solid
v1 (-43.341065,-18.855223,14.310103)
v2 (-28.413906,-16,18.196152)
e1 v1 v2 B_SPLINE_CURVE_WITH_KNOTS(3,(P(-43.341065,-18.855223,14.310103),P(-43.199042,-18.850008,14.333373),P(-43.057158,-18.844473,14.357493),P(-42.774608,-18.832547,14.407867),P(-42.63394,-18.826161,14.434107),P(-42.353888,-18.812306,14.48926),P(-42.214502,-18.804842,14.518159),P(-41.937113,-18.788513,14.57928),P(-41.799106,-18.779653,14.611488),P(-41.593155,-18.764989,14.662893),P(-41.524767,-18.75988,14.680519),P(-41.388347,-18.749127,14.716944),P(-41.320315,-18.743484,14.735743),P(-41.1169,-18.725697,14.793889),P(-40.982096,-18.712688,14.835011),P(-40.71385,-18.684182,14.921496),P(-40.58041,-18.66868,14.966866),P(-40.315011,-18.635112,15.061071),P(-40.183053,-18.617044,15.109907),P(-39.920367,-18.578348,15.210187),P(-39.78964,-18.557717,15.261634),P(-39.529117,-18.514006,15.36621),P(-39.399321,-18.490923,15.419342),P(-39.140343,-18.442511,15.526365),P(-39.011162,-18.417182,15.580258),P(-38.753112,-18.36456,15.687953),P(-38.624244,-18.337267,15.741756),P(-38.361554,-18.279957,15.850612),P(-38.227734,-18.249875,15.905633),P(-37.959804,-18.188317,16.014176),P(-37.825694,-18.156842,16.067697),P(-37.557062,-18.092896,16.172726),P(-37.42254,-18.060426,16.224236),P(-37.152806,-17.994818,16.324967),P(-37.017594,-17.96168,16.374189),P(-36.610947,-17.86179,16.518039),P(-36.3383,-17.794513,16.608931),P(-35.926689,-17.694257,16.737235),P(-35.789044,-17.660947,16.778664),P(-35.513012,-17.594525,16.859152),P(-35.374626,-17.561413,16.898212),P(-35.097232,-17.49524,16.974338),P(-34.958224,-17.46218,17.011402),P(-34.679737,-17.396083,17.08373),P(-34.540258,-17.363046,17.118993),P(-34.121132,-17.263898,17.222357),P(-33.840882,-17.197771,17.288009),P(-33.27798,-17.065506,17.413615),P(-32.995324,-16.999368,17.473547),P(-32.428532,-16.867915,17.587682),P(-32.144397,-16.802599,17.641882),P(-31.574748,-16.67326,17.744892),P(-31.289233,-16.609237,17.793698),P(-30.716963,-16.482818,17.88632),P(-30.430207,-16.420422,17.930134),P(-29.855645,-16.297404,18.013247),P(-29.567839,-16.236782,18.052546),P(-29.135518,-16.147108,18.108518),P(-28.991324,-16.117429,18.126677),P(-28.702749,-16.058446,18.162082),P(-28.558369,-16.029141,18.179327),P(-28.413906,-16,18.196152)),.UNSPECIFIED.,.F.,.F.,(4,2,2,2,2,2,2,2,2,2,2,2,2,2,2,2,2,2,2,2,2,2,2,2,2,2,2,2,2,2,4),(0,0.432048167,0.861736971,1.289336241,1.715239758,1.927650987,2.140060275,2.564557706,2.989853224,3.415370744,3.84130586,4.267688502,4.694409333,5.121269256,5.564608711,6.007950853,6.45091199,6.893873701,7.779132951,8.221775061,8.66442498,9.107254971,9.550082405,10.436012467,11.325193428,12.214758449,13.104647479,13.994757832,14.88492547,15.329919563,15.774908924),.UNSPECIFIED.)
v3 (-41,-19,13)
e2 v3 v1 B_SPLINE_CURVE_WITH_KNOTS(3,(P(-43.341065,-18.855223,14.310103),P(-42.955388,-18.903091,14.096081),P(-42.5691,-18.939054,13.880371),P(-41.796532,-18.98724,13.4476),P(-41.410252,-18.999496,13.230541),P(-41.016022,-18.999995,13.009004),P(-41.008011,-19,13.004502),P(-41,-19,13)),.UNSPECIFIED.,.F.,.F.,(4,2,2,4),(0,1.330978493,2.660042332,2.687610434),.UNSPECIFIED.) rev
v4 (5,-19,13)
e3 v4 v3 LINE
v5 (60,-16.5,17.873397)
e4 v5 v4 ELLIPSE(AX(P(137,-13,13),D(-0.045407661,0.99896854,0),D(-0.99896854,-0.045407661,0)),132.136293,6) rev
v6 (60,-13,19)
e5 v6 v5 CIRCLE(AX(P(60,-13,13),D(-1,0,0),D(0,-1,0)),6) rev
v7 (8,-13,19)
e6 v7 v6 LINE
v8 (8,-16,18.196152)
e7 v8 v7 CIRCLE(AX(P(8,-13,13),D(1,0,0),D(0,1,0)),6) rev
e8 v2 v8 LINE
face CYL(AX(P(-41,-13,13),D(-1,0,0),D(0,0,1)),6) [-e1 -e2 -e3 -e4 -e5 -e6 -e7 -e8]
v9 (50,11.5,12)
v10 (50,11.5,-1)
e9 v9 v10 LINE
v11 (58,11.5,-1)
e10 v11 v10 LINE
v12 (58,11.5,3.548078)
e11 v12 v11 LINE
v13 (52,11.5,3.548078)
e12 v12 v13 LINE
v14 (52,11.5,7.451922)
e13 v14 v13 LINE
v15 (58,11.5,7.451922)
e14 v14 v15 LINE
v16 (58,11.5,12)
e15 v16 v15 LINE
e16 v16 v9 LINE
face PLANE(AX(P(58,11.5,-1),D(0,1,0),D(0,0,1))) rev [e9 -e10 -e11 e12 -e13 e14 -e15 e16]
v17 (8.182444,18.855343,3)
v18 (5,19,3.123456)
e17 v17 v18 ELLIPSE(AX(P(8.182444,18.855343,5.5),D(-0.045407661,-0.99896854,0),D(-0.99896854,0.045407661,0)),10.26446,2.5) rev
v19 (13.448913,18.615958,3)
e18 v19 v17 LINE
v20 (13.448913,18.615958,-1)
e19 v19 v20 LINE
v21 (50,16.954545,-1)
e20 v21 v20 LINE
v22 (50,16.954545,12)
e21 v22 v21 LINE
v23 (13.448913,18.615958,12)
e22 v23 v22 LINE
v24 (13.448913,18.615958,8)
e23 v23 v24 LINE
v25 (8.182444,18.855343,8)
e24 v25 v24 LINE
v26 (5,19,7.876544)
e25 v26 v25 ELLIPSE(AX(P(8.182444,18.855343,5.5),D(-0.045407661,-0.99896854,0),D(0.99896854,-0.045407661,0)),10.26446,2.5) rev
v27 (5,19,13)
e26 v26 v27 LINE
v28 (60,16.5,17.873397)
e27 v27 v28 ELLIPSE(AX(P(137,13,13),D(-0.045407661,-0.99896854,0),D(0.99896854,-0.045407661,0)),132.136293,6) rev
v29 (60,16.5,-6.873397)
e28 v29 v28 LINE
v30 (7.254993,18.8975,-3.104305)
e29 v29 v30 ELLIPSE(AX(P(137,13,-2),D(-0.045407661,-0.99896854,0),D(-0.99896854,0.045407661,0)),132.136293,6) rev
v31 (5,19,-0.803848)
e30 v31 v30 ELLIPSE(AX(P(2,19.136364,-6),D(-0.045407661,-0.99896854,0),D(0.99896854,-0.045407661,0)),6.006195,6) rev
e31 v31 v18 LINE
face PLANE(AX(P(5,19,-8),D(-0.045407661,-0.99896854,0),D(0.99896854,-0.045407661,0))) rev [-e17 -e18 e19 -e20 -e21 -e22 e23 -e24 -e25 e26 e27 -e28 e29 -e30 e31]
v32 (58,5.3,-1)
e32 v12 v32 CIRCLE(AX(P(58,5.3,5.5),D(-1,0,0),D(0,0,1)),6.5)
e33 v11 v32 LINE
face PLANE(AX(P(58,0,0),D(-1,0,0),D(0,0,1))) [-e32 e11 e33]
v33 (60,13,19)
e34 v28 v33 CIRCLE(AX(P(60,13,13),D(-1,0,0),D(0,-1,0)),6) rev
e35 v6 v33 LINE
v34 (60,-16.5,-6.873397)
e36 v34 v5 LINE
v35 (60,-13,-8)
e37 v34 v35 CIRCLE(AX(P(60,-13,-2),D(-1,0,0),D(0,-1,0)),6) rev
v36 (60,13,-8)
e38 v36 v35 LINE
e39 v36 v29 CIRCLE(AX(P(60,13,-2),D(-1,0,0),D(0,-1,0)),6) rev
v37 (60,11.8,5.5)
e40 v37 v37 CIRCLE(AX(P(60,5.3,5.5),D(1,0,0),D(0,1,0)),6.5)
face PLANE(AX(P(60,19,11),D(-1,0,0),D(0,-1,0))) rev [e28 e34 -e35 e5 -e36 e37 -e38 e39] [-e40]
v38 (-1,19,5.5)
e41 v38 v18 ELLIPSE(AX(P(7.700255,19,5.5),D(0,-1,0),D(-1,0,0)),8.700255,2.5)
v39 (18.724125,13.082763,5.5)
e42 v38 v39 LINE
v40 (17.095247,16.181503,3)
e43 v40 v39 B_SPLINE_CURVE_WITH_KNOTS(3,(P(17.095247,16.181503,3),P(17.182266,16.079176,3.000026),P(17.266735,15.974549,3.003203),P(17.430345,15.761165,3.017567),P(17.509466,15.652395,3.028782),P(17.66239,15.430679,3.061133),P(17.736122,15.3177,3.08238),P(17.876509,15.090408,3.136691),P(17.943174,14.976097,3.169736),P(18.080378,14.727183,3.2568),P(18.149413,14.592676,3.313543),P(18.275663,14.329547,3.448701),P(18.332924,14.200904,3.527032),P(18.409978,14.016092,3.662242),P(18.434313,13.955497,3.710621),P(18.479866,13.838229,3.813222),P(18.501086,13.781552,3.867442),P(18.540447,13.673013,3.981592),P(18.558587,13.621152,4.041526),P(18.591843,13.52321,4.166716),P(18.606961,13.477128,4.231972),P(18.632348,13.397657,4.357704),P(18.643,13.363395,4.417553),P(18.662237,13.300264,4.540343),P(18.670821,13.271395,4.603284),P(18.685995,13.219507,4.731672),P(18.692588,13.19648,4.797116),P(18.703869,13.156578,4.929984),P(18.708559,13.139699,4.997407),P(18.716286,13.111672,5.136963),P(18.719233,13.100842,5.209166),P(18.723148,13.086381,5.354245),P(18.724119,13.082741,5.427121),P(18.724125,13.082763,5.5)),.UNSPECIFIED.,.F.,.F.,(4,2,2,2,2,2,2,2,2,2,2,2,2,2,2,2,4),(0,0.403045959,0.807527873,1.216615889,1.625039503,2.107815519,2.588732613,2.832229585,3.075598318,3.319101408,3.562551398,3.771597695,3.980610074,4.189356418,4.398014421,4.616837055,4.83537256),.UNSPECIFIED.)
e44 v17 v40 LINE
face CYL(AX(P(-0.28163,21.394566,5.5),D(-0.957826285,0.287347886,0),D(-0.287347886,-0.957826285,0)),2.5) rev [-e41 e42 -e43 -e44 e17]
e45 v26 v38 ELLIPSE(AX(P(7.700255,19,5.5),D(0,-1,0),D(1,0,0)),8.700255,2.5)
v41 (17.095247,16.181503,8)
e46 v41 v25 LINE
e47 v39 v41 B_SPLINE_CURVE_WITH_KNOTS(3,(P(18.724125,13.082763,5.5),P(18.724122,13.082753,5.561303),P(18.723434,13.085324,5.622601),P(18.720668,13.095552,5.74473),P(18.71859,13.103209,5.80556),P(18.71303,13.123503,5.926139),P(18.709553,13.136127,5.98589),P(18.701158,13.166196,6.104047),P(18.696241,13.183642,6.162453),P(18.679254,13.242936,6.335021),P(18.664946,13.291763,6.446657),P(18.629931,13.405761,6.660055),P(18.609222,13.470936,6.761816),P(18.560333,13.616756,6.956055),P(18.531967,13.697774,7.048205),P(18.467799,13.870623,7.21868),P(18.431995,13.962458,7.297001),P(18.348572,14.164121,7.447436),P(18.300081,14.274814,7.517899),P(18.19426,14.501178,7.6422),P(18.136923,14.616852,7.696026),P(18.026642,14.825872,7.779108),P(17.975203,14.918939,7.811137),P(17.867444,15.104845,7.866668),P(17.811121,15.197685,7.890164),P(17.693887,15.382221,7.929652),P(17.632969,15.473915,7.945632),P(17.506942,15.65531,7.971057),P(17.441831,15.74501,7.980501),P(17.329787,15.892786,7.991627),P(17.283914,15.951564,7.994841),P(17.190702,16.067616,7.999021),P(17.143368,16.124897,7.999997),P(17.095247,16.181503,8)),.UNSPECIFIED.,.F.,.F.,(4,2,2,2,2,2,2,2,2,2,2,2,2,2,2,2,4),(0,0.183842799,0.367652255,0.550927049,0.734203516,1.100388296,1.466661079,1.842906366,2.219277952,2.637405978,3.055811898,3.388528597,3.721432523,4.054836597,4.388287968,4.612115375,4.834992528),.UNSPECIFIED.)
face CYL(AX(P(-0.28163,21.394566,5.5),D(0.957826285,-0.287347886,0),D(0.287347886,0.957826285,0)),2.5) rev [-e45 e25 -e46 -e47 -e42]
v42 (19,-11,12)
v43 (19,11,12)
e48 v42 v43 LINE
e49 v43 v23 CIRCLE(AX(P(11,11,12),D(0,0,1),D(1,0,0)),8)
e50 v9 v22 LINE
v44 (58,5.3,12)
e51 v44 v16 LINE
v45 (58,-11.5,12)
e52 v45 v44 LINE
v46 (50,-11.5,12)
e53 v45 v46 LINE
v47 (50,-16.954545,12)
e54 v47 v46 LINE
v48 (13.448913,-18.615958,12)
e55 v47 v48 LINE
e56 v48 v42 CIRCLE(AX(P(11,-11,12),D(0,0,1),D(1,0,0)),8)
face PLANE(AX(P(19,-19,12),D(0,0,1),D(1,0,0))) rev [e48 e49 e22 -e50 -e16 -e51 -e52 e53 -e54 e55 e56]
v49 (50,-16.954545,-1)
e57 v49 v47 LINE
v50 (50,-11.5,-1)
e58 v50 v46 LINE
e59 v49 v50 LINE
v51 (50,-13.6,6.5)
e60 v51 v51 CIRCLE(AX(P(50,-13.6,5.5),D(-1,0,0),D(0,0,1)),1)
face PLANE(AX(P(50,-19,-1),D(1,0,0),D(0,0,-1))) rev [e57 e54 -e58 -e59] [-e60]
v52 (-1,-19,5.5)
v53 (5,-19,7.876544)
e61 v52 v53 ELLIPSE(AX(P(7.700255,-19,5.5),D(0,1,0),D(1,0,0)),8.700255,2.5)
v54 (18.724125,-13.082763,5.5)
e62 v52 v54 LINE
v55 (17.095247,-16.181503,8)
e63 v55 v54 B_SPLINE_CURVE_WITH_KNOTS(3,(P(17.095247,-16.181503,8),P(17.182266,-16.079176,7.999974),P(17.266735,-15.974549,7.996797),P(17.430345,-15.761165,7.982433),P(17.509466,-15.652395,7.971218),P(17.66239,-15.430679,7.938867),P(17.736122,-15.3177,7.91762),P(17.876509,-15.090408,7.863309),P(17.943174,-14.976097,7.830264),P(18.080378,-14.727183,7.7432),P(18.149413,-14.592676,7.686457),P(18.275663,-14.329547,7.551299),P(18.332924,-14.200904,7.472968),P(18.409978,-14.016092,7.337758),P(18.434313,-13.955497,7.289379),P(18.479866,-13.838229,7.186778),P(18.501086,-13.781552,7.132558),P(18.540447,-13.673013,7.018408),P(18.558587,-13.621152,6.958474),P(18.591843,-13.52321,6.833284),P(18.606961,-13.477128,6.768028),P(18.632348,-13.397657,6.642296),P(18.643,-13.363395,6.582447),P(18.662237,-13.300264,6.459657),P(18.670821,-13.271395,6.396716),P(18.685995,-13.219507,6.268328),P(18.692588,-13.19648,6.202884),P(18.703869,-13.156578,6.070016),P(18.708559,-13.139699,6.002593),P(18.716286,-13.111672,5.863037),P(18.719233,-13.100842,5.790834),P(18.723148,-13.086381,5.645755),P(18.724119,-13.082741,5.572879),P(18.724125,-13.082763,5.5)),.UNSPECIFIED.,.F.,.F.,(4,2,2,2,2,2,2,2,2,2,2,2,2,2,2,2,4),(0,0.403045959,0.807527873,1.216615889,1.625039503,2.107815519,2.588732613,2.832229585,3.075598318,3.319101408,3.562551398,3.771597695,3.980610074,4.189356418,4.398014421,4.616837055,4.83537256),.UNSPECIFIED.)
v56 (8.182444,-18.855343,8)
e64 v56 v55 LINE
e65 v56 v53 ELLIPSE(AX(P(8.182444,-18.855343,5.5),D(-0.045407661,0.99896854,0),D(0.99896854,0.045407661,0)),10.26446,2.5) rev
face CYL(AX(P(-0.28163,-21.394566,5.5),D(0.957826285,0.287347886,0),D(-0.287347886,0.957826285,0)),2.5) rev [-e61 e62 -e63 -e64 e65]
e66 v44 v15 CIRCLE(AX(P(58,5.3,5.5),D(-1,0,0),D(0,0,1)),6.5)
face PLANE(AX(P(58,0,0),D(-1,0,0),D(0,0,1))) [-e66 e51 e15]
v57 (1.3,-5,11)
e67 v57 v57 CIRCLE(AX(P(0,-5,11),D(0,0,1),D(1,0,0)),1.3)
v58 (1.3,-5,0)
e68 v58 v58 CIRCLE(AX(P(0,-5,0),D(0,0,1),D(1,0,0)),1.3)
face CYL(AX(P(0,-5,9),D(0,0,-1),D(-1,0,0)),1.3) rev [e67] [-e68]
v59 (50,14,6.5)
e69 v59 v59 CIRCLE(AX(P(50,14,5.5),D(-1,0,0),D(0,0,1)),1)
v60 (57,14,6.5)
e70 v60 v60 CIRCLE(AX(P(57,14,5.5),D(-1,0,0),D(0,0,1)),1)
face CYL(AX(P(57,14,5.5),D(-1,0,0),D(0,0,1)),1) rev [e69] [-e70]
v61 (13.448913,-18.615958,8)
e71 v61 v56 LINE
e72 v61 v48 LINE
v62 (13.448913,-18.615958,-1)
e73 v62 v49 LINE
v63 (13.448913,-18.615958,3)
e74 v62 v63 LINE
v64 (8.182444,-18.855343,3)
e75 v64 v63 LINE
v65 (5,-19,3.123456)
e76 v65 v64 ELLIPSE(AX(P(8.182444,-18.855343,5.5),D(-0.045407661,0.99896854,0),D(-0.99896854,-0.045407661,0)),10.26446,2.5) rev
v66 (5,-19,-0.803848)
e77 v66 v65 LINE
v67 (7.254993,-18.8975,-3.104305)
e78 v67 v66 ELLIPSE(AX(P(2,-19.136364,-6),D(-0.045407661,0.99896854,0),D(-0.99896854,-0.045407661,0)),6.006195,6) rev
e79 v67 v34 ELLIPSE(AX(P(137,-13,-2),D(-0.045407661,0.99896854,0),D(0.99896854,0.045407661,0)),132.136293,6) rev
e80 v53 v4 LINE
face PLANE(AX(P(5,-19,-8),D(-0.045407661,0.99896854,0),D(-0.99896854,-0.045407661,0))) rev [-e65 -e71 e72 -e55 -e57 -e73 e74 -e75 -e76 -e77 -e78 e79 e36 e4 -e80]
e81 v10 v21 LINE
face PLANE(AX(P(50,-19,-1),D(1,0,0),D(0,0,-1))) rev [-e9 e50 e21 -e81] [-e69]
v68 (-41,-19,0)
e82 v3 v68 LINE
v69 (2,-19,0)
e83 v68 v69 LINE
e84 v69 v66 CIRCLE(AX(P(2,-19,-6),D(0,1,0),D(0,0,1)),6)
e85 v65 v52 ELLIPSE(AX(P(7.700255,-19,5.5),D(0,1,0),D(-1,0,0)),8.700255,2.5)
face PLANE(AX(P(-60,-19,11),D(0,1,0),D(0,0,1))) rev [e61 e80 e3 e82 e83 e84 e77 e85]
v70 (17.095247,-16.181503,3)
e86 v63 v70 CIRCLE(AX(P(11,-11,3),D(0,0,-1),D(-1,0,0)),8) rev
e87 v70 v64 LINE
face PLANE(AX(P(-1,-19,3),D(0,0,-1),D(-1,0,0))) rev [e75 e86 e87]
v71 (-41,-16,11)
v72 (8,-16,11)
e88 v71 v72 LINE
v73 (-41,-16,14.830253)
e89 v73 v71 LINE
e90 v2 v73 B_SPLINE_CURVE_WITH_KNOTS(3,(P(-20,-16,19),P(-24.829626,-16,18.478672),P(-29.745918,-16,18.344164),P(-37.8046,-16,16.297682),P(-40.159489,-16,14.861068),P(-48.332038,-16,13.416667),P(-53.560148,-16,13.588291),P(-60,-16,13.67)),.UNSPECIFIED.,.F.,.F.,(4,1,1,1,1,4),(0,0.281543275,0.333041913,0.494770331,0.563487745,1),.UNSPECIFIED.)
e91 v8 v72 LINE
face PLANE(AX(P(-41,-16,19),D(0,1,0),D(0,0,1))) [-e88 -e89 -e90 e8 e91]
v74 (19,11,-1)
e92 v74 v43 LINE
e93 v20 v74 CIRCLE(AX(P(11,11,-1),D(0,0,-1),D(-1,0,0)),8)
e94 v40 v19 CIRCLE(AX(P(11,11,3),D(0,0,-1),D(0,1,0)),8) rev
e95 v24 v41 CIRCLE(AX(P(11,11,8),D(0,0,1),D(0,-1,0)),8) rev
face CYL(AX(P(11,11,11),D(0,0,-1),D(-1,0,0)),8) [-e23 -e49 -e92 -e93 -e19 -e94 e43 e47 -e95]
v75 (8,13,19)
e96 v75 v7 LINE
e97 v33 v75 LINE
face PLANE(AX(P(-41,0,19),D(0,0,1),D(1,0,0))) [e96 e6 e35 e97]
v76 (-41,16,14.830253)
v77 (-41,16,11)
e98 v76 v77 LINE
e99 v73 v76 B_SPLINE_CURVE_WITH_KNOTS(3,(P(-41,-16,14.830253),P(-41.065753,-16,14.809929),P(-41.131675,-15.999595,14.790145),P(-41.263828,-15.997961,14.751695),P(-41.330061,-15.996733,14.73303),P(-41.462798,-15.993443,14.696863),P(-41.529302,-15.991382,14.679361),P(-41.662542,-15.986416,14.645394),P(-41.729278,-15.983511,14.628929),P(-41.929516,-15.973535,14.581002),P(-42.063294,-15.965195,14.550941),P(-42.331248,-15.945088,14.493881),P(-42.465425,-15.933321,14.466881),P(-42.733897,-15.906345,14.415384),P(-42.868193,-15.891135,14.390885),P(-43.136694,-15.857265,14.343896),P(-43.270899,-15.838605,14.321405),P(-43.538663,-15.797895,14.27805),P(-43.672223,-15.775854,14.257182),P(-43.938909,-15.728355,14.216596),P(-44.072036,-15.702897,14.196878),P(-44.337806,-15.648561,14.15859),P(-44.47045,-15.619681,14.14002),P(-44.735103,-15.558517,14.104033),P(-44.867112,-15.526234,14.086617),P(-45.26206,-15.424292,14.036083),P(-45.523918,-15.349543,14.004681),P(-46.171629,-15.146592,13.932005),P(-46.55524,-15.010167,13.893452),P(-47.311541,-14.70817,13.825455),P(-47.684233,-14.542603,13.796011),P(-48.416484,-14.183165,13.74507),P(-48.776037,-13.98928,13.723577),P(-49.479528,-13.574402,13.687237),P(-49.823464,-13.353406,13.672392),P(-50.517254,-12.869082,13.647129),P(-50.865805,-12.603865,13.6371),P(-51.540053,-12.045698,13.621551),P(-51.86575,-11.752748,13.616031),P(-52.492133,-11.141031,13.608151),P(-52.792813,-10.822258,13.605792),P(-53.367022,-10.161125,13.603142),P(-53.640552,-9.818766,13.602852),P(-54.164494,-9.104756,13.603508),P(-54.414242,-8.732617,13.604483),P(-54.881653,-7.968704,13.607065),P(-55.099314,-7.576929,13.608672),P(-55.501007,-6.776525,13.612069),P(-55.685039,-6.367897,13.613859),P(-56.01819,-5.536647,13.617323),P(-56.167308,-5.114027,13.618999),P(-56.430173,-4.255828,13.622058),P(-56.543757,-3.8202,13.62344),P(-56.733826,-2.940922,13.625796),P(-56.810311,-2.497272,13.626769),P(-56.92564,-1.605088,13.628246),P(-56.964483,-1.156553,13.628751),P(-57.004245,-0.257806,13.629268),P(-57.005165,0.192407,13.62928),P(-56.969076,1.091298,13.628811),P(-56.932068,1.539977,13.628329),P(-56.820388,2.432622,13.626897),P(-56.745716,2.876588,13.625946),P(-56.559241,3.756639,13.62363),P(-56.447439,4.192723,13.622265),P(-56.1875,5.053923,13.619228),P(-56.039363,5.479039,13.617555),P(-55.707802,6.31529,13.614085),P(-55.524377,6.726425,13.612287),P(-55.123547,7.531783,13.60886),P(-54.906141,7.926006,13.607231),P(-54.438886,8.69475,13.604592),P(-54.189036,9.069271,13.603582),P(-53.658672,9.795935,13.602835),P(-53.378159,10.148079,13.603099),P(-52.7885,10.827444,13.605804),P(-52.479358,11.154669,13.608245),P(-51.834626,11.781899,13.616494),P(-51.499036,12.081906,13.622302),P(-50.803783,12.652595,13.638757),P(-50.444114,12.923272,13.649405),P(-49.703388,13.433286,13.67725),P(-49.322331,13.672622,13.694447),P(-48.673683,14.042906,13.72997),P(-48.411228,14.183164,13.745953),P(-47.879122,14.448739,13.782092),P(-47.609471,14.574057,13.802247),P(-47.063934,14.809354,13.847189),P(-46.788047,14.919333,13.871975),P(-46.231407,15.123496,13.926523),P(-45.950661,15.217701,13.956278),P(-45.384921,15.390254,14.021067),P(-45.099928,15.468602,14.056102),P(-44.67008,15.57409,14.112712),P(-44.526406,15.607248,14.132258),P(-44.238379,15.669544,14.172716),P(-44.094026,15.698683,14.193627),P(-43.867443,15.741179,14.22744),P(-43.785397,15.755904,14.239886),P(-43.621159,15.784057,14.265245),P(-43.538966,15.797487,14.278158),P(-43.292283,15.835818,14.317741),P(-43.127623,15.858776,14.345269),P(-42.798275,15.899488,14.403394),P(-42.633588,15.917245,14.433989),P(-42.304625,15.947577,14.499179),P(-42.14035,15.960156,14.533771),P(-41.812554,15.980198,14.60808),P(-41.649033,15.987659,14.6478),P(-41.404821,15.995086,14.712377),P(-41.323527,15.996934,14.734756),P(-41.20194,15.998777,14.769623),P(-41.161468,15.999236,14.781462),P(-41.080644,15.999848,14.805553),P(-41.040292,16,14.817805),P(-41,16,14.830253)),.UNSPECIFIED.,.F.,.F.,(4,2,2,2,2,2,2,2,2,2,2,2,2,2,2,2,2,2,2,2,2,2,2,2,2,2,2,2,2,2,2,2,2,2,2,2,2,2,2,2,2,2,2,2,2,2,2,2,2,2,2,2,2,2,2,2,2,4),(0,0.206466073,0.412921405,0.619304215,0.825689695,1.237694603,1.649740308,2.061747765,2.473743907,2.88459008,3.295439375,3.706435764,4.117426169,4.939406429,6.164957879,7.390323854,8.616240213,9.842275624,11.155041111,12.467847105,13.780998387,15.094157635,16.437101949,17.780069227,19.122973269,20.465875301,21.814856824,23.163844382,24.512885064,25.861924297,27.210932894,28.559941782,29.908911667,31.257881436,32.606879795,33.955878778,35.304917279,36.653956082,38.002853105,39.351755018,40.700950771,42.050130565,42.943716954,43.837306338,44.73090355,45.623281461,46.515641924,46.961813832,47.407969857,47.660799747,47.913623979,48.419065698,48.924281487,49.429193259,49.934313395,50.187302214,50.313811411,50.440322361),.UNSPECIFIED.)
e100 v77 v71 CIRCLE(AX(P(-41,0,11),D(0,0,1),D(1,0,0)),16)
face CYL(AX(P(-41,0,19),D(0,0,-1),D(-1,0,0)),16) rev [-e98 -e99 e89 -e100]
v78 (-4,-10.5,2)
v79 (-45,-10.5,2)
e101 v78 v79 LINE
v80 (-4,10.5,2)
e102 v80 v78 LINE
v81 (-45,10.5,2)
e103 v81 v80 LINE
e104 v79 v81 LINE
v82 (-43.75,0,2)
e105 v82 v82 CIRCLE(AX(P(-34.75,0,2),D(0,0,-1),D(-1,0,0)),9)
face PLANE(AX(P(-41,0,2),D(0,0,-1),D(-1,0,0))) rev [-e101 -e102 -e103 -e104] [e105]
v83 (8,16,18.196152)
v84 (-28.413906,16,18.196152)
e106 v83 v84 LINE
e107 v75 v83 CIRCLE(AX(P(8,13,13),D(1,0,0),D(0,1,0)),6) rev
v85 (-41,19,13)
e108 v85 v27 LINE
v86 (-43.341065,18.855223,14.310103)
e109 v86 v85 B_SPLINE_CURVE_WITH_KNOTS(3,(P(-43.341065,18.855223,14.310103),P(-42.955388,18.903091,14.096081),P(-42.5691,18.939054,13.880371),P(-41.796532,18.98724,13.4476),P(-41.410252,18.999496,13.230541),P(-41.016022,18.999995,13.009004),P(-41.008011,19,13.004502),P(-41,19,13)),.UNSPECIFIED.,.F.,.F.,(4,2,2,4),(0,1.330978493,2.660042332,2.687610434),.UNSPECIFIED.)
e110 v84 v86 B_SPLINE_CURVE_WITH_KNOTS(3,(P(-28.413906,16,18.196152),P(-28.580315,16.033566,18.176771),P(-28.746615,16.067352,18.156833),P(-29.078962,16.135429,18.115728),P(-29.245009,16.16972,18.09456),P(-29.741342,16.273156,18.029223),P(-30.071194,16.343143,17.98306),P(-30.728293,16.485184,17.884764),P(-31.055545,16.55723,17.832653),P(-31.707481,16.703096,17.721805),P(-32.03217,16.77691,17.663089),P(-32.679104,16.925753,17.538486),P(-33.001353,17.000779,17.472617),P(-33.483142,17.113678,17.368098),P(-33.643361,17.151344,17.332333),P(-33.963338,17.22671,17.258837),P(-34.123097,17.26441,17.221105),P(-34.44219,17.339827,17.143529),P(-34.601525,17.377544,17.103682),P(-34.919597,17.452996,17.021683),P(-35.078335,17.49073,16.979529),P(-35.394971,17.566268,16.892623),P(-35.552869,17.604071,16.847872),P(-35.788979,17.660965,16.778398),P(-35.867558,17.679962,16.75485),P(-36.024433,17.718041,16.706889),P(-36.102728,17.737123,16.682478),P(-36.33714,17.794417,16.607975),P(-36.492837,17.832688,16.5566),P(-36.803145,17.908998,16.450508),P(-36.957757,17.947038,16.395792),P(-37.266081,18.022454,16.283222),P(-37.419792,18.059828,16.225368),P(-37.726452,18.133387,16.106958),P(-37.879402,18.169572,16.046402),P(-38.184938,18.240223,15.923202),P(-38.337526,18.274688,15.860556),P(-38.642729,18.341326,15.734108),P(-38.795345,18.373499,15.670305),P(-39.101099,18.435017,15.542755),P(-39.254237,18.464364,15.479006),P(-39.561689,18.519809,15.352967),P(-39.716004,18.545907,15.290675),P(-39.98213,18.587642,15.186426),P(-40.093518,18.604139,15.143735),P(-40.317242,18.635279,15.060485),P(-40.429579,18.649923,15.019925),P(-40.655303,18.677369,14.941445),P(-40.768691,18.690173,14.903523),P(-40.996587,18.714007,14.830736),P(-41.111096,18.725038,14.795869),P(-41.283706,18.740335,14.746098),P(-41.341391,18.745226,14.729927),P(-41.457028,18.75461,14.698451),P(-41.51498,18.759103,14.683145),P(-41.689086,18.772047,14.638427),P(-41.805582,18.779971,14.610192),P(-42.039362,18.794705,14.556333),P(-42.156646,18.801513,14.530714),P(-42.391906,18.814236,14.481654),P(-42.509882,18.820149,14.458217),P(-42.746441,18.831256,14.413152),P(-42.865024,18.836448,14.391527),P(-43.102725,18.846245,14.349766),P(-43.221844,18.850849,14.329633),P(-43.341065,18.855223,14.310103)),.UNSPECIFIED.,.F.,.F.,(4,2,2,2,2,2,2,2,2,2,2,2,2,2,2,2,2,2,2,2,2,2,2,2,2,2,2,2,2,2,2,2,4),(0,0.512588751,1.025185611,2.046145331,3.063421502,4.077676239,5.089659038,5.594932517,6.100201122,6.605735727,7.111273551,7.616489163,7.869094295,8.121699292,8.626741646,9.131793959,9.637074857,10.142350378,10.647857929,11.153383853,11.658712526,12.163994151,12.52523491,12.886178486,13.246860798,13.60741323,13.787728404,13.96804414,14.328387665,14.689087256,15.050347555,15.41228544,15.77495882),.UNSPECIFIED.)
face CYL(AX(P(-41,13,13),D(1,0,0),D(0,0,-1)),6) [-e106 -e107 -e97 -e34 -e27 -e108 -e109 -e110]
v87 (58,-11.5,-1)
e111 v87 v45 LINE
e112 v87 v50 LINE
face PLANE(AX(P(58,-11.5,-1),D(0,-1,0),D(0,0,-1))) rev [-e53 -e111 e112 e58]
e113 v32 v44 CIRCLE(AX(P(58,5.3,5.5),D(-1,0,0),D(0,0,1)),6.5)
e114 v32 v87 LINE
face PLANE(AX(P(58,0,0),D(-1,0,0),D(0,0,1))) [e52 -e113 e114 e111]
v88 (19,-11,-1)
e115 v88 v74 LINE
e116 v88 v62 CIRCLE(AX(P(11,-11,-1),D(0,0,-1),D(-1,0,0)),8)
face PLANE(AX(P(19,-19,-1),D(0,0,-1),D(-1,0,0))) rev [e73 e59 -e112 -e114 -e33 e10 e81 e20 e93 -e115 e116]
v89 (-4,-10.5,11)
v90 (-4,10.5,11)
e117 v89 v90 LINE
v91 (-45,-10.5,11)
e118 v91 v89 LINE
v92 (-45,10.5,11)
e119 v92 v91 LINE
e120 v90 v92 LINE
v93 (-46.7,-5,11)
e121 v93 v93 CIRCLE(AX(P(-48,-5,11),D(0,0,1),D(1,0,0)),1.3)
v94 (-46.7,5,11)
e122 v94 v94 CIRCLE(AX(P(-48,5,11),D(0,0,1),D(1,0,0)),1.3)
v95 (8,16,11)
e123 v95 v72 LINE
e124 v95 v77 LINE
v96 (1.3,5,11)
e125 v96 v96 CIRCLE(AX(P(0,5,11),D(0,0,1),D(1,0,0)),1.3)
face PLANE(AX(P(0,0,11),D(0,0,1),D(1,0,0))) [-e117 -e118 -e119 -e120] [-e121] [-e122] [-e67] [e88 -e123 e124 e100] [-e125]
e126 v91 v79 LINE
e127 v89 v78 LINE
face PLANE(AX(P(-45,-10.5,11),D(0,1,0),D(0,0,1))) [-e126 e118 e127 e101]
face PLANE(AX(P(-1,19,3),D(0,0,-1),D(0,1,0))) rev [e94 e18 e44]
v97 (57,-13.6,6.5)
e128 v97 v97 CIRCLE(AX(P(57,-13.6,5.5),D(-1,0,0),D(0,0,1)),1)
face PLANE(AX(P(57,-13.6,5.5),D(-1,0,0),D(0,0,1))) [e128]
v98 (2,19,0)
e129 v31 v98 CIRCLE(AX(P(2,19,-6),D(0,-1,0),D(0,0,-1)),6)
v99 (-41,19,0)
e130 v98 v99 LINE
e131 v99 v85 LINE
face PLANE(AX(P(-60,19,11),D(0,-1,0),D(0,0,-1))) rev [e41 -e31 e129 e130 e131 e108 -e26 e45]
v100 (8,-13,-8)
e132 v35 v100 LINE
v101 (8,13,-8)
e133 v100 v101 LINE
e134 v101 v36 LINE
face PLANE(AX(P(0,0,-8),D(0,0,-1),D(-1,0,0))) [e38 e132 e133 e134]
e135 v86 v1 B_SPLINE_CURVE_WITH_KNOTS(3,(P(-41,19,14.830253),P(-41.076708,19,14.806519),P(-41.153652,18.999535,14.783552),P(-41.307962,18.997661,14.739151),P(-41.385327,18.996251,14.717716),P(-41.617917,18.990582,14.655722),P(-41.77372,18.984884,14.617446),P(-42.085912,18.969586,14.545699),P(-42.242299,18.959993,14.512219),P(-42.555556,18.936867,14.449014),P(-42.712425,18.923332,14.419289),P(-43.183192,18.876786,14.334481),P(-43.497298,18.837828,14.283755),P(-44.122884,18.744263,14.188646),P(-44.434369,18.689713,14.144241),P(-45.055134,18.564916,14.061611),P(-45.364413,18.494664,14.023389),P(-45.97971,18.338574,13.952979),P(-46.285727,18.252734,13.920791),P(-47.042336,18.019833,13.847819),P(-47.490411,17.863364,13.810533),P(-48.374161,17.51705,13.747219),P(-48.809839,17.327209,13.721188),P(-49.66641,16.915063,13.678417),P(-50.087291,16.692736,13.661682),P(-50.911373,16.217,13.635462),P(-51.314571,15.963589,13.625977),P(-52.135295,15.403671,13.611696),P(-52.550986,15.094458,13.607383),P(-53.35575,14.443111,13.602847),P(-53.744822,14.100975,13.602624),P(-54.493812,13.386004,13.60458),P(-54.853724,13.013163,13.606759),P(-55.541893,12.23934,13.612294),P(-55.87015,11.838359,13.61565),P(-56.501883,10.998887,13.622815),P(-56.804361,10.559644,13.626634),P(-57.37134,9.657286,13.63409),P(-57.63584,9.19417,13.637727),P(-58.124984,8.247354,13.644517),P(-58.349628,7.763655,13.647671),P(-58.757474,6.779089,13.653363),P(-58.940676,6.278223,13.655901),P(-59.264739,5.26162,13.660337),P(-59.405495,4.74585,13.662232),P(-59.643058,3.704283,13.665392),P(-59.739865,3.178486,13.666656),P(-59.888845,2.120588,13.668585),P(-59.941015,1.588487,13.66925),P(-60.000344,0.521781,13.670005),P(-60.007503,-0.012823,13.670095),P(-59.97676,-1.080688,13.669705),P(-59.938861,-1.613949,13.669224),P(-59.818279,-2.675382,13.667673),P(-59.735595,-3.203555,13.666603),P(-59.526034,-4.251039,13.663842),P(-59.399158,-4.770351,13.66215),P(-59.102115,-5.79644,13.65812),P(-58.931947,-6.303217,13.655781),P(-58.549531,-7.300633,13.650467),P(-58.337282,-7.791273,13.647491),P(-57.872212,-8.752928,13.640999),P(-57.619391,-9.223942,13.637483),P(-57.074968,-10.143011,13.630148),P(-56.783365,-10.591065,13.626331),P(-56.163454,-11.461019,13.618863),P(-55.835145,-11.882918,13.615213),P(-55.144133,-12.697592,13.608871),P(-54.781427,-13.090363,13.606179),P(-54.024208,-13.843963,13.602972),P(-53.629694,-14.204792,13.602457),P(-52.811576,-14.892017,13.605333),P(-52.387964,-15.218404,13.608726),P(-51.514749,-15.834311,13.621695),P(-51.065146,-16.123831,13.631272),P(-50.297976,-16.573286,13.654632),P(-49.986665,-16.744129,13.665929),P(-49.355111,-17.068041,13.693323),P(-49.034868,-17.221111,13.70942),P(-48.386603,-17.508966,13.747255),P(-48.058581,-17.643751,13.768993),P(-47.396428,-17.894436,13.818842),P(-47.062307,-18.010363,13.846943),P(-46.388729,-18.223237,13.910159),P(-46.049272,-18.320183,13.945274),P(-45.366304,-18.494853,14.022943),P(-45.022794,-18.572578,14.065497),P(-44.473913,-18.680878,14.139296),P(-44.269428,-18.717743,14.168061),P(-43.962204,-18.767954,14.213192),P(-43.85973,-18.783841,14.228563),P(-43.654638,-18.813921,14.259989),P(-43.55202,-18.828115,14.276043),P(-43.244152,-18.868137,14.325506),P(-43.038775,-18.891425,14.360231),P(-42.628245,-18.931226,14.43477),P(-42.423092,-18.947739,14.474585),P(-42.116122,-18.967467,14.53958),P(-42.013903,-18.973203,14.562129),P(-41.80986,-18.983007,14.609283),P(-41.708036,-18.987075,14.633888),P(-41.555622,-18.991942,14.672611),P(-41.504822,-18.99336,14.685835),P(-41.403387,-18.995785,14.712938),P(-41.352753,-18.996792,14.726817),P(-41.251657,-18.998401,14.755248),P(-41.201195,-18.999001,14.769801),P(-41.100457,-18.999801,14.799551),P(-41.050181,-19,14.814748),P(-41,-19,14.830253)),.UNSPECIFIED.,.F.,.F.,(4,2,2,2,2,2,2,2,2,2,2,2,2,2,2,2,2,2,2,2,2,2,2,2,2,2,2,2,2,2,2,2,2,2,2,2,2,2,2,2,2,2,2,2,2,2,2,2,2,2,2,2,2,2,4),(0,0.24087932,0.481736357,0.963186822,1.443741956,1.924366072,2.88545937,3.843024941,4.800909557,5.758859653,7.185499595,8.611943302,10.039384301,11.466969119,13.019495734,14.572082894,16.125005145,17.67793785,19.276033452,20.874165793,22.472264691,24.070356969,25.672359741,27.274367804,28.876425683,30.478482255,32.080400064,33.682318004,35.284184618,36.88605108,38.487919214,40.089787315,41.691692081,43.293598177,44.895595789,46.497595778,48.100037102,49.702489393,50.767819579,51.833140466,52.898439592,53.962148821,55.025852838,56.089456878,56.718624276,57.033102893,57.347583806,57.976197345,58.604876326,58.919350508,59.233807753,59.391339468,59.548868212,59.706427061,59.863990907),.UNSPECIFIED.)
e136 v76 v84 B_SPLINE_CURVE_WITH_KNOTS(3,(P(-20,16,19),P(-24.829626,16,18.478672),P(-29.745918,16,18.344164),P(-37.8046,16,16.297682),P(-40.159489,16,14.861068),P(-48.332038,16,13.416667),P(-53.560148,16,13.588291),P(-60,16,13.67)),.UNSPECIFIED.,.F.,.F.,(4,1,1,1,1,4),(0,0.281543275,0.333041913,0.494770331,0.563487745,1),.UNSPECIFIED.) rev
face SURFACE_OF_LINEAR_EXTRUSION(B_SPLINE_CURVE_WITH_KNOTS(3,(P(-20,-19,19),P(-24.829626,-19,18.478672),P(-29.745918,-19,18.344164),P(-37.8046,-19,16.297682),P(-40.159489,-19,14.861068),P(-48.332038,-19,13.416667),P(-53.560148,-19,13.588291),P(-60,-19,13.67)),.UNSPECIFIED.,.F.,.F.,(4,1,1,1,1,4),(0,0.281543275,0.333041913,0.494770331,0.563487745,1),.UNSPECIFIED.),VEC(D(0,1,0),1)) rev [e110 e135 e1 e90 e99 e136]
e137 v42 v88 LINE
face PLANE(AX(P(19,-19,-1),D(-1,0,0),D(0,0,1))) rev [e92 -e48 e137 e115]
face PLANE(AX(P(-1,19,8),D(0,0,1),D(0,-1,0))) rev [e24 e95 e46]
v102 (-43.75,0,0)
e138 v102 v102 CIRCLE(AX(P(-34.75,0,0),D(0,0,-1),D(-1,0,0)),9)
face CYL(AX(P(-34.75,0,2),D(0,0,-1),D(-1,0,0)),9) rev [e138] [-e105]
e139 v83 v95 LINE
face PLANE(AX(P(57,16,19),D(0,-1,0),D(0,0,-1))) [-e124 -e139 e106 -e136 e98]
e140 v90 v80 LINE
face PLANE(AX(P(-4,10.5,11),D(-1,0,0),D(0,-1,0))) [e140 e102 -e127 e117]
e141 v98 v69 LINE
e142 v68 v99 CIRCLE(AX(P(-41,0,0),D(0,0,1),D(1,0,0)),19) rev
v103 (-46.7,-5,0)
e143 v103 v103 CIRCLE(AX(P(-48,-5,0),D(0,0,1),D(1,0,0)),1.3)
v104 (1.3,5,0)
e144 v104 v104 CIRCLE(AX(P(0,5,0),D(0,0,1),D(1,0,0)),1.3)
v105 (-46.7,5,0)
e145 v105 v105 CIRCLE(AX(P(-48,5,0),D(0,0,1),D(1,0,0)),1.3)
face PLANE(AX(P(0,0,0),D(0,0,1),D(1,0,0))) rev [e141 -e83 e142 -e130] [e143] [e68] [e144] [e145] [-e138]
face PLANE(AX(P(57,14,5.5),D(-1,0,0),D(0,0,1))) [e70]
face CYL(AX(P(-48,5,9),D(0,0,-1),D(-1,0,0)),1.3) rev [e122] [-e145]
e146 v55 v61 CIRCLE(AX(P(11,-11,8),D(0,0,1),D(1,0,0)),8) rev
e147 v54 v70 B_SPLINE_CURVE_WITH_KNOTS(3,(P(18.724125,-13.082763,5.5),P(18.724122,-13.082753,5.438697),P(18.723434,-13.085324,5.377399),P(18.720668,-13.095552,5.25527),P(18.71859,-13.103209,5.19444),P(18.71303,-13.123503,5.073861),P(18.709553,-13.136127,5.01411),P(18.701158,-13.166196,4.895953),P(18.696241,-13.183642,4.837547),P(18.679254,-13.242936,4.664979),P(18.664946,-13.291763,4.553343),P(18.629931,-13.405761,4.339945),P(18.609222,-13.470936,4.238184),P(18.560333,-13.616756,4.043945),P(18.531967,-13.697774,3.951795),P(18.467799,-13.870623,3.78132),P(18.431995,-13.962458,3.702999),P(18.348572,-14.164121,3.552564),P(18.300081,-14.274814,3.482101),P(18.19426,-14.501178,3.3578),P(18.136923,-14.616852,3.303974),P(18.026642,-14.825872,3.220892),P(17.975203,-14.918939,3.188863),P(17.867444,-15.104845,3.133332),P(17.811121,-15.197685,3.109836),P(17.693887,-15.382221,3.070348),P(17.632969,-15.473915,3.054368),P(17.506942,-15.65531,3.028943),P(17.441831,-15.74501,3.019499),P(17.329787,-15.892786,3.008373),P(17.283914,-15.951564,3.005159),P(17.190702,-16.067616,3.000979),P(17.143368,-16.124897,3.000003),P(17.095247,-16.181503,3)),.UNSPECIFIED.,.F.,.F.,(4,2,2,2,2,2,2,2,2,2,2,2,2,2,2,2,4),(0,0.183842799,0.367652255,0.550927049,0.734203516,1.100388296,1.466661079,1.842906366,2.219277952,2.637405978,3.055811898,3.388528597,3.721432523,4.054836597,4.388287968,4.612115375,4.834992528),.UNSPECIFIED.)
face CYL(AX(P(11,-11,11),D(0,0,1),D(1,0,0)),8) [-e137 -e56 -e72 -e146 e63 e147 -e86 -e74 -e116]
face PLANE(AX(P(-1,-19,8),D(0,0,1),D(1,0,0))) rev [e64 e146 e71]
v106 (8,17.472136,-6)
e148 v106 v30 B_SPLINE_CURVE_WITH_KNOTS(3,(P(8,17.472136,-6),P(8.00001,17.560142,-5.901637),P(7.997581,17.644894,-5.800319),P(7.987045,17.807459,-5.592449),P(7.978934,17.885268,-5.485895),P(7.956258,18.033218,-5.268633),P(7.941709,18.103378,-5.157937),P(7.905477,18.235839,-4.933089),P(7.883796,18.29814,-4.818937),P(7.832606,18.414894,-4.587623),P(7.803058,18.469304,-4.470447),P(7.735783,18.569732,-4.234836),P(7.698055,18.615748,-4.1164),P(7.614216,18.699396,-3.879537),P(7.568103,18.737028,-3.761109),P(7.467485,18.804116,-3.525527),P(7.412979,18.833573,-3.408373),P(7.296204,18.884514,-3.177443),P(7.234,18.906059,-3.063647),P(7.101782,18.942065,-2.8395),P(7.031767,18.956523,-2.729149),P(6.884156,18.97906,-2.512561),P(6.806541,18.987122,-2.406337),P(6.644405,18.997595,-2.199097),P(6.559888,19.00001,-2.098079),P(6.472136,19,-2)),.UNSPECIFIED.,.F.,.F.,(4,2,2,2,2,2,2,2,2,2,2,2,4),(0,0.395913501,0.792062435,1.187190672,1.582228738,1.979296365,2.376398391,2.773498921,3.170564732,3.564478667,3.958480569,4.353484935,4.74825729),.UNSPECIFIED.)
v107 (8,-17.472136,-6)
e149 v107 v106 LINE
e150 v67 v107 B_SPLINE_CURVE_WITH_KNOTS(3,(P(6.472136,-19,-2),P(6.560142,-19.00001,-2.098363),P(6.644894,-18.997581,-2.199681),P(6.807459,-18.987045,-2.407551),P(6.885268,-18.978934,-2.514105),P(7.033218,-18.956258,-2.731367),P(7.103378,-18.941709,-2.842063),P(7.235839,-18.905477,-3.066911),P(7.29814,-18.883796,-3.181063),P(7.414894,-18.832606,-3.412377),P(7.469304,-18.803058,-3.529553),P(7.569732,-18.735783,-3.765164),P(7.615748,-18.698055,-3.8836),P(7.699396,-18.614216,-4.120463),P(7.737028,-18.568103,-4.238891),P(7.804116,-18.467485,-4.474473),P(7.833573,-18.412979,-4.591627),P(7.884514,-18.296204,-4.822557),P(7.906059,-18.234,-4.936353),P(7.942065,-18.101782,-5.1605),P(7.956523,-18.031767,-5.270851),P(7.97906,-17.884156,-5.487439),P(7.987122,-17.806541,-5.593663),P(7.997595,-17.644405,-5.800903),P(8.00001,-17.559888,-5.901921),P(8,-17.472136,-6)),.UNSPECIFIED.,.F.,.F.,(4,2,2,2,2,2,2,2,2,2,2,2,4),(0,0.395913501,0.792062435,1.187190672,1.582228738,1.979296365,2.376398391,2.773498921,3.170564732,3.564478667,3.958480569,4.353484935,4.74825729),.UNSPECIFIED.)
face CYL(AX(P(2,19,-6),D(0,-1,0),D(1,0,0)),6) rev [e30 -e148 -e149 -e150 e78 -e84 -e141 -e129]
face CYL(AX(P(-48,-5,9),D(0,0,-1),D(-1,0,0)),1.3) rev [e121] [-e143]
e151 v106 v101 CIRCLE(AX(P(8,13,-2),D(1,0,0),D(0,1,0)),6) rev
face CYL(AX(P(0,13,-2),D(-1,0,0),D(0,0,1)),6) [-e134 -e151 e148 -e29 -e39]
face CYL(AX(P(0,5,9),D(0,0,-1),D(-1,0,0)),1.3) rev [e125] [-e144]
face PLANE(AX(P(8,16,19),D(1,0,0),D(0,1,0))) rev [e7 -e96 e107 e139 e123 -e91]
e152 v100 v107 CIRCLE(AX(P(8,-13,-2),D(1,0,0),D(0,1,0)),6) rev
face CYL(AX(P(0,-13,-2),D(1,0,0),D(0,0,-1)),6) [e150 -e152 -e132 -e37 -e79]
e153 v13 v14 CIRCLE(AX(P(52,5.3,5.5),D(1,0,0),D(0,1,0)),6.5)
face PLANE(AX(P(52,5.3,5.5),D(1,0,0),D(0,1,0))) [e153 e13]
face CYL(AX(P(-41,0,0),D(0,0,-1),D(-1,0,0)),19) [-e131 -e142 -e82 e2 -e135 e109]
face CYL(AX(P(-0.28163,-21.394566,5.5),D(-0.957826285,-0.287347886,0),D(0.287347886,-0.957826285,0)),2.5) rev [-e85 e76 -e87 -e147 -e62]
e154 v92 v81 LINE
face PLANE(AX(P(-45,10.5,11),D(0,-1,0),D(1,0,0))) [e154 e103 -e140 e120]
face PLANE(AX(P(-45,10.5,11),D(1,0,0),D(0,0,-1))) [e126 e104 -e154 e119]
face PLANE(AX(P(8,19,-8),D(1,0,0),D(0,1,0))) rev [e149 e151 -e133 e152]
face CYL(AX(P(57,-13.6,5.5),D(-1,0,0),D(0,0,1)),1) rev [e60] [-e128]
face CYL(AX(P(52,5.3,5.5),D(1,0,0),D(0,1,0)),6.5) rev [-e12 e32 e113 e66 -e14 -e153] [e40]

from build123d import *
from OCP.BRepFilletAPI import BRepFilletAPI_MakeChamfer

# Parameters (mm, degrees)
SKETCH1_W               = 120
SKETCH1_H               = 38
SKETCH1_W_2             = 41
SKETCH1_H_2             = 21
BOSS_EXTRUDE1_DEPTH     = 11
SKETCH2_R               = 1.3
CUT_EXTRUDE1_DEPTH      = 8
FILLET1_RADIUS          = 19
FILLET1_LENGTH          = 11
BOSS_EXTRUDE2_START     = 8
BOSS_EXTRUDE2_DEPTH     = 8
FILLET2_R               = 16
CUT_EXTRUDE2_DEPTH      = 66.741919656
CUT_EXTRUDE2_DEPTH_BACK = 66.741919656
BOSS_EXTRUDE3_START     = 8
BOSS_EXTRUDE3_OUTLINE_W = 32
BOSS_EXTRUDE3_OUTLINE_H = 8
BOSS_EXTRUDE3_DEPTH     = 49
SKETCH6_W               = 52
SKETCH6_H               = 38
BOSS_EXTRUDE4_DEPTH     = 8
CUT_EXTRUDE3_DEPTH      = 74.518705262
CUT_EXTRUDE3_DEPTH_BACK = 74.518705262
SKETCH7_W               = 31
SKETCH7_H               = 13
SKETCH8_W               = 13
SKETCH8_H               = 23
CUT_EXTRUDE4_DEPTH      = 8
BOSS_EXTRUDE5_START     = -2
SKETCH9_R               = 9
BOSS_EXTRUDE5_DEPTH     = 2
SKETCH10_R              = 6.5
CUT_EXTRUDE5_DEPTH      = 8
SKETCH12_W              = 5
SKETCH12_H              = 6
CUT_EXTRUDE6_DEPTH      = 20
CHAMFER1_SIZE           = 6
CHAMFER1_SIZE_2         = 20
FILLET3_R               = 8
FILLET4_R               = 6
FILLET5_R               = 6
FILLET6_R               = 2.5
SKETCH13_R              = 1.1
CUT_EXTRUDE7_DEPTH      = 8
CUT_EXTRUDE8_DEPTH      = 69.483574828
CUT_EXTRUDE8_DEPTH_BACK = 69.483574828
CUT_EXTRUDE9_DEPTH      = 66.741919805
CUT_EXTRUDE9_DEPTH_BACK = 66.741919805
SKETCH15_R              = 1.3
SKETCH16_R              = 1.1
BOSS_EXTRUDE6_DEPTH     = 8
SKETCH17_R              = 1
CUT_EXTRUDE10_DEPTH     = 7


# Read off the part's stored shape, not the designer's step: Boss-Extrude3
# Some blends are built 0.0001 mm under size
with BuildPart() as part:
    # Sketch1 → Boss-Extrude1 (new body)
    with BuildSketch(Plane.XY):
        Rectangle(SKETCH1_W, SKETCH1_H)
        with Locations((-24.5, 0)):
            Rectangle(SKETCH1_W_2, SKETCH1_H_2, mode=Mode.SUBTRACT)
    extrude(amount=BOSS_EXTRUDE1_DEPTH)

    # Sketch2 → Cut-Extrude1 (cut)
    with BuildSketch(Plane.XY.offset(1)):
        with Locations((0, 5)):
            Circle(SKETCH2_R)
        with Locations((-48, 5)):
            Circle(SKETCH2_R)
        with Locations((-48, -5)):
            Circle(SKETCH2_R)
        with Locations((0, -5)):
            Circle(SKETCH2_R)
    extrude(amount=CUT_EXTRUDE1_DEPTH, mode=Mode.SUBTRACT)

    # Fillet1: full round fillet: the end face becomes a half cylinder, R = half its width
    fillet1_face = Plane((-60, 0, 5.5), x_dir=(0, 0, 1), z_dir=(-1, 0, 0))  # on the end face: x along it, z out of the body
    fillet1_slab = fillet1_face.offset(-FILLET1_RADIUS / 2) * Box(FILLET1_LENGTH, 2 * FILLET1_RADIUS, FILLET1_RADIUS, mode=Mode.PRIVATE)  # the body's end, R deep
    fillet1_round = Plane((-41, 0, 5.5), x_dir=(-1, 0, 0), z_dir=(0, 0, 1)) * Cylinder(FILLET1_RADIUS, FILLET1_LENGTH, mode=Mode.PRIVATE)  # its axis R under the face
    add(fillet1_slab - fillet1_round, mode=Mode.SUBTRACT)

    # Sketch3 → Boss-Extrude2 (add)
    with BuildSketch(Plane.XY.offset(11).offset(BOSS_EXTRUDE2_START)):
        with BuildLine():
            Line((60, 19), (-41, 19))
            ThreePointArc((-41, 19), (-60, 0), (-41, -19))
            Line((-41, -19), (60, -19))
            Line((60, -19), (60, 19))
        make_face()
        with BuildLine():
            Line((57, 16), (-41, 16))
            ThreePointArc((-41, 16), (-57, 0), (-41, -16))
            Line((-41, -16), (57, -16))
            Line((57, -16), (57, 16))
        make_face(mode=Mode.SUBTRACT)
    extrude(amount=-BOSS_EXTRUDE2_DEPTH)

    # Fillet2
    fillet2_edges = [part.edges().sort_by_distance(p)[0] for p in [
        (57, 16, 15),
        (57, -16, 15),
    ]]
    fillet(fillet2_edges, radius=FILLET2_R - 0.0001)  # a hair under: the kernel refuses the full size

    # Sketch4 → Cut-Extrude2 (cut, two sides: drawn at the far end of the back side and taken through both)
    with BuildSketch(Plane(origin=(0, 0, 0), x_dir=(1, 0, 0), z_dir=(0, 1, 0)).offset(-CUT_EXTRUDE2_DEPTH_BACK)):
        with BuildLine():
            Line((-60, -13.67), (-60, -19))
            Line((-60, -19), (-20, -19))
            add(Edge.make_bspline(
                [(-60, -13.67), (-53.560147586, -13.588290525), (-48.332037755, -13.416667168), (-40.159488654, -14.861068215), (-37.804599967, -16.297682364), (-29.745918458, -18.344163696), (-24.82962643, -18.478671578), (-20, -19)],
                knots=[0, 0, 0, 0, 0.436512255, 0.505229669, 0.666958087, 0.718456725, 1, 1, 1, 1], degree=3))
        make_face()
    extrude(amount=CUT_EXTRUDE2_DEPTH + CUT_EXTRUDE2_DEPTH_BACK, mode=Mode.SUBTRACT)

    # Boss-Extrude3 outline → Boss-Extrude3 (add)
    with BuildSketch(Plane.YZ.offset(BOSS_EXTRUDE3_START)):
        with Locations((0, 15)):
            Rectangle(BOSS_EXTRUDE3_OUTLINE_W, BOSS_EXTRUDE3_OUTLINE_H)
    extrude(amount=BOSS_EXTRUDE3_DEPTH)

    # Sketch6 → Boss-Extrude4 (add)
    with BuildSketch(Plane(origin=(0, 0, 0), x_dir=(-1, 0, 0), z_dir=(0, 0, -1))):
        with Locations((-34, 0)):
            Rectangle(SKETCH6_W, SKETCH6_H)
    extrude(amount=BOSS_EXTRUDE4_DEPTH)

    # Sketch7 → Cut-Extrude3 (cut, two sides: drawn at the far end of the back side and taken through both)
    with BuildSketch(Plane(origin=(0, 19, 0), x_dir=(1, 0, 0), z_dir=(0, 1, 0)).offset(-CUT_EXTRUDE3_DEPTH_BACK)):
        with Locations((34.5, -5.5)):
            Rectangle(SKETCH7_W, SKETCH7_H)
    extrude(amount=CUT_EXTRUDE3_DEPTH + CUT_EXTRUDE3_DEPTH_BACK, mode=Mode.SUBTRACT)

    # Sketch8 → Cut-Extrude4 (cut)
    with BuildSketch(Plane.ZY.offset(-50)):
        with Locations((5.5, 0)):
            Rectangle(SKETCH8_W, SKETCH8_H)
    extrude(amount=-CUT_EXTRUDE4_DEPTH, mode=Mode.SUBTRACT)

    # Sketch9 → Boss-Extrude5 (add)
    with BuildSketch(Plane(origin=(0, 0, 0), x_dir=(-1, 0, 0), z_dir=(0, 0, -1)).offset(BOSS_EXTRUDE5_START)):
        with BuildLine():
            Line((-8, 19), (-8, -19))
            Line((-8, -19), (41, -19))
            ThreePointArc((41, -19), (60, 0), (41, 19))
            Line((41, 19), (-8, 19))
        make_face()
        with Locations((34.75, 0)):
            Circle(SKETCH9_R, mode=Mode.SUBTRACT)
    extrude(amount=BOSS_EXTRUDE5_DEPTH)

    # Sketch10 → Cut-Extrude5 (cut)
    with BuildSketch(Plane(origin=(60, 0, 0), x_dir=(0, 0, -1), z_dir=(1, 0, 0))):
        with Locations(Location((-5.5, 5.3, 0), (0, 0, 90))):
            Circle(SKETCH10_R)
    extrude(amount=-CUT_EXTRUDE5_DEPTH, mode=Mode.SUBTRACT)

    # Sketch12 → Cut-Extrude6 (cut)
    with BuildSketch(Plane(origin=(19, 0, 0), x_dir=(0, 0, -1), z_dir=(1, 0, 0))):
        with Locations((-5.5, 16)):
            Rectangle(SKETCH12_W, SKETCH12_H)
        with Locations((-5.5, -16)):
            Rectangle(SKETCH12_W, SKETCH12_H)
    extrude(amount=-CUT_EXTRUDE6_DEPTH, mode=Mode.SUBTRACT)

    # Chamfer1
    chamfer1_edges_1 = [part.edges().sort_by_distance(p)[0] for p in [
        (-1, -13, 5.5),
    ]]
    chamfer1_side_1 = [part.faces().sort_by_distance(p)[0] for p in [
        (-1, -13.12, 5.5),
    ]]
    chamfer1_edges_2 = [part.edges().sort_by_distance(p)[0] for p in [
        (-1, 13, 5.5),
    ]]
    chamfer1_side_2 = [part.faces().sort_by_distance(p)[0] for p in [
        (-1, 13.12, 5.5),
    ]]
    chamfer1 = BRepFilletAPI_MakeChamfer(part.part.solid().wrapped)
    for e in chamfer1_edges_1:
        chamfer1.Add(CHAMFER1_SIZE - 0.0001, CHAMFER1_SIZE_2 - 0.0001, e.wrapped, chamfer1_side_1[0].wrapped)
    for e in chamfer1_edges_2:
        chamfer1.Add(CHAMFER1_SIZE - 0.0001, CHAMFER1_SIZE_2 - 0.0001, e.wrapped, chamfer1_side_2[0].wrapped)
    add(Compound.cast(chamfer1.Shape()), mode=Mode.REPLACE)  # a hair under: the kernel refuses the full size

    # Fillet3
    # the kernel refuses this fillet: 8 mm, written as the material it takes off along each edge
    with BuildSketch(Plane(origin=(19, 19, -1), x_dir=(0, -1, 0), z_dir=(0, 0, 1))) as fillet3_piece_1_section:
        with BuildLine():
            CenterArc((FILLET3_R, -FILLET3_R), FILLET3_R, 90, 90)
            Line((0, -FILLET3_R), (0, 0))
            Line((0, 0), (FILLET3_R, 0))
        make_face()
    fillet3_piece_1 = extrude(amount=24, mode=Mode.PRIVATE)
    fillet3_piece_1 = split(fillet3_piece_1, bisect_by=Plane(origin=(18.924002019, 12.501601439, 12), z_dir=(0, 0, -1)), keep=Keep.TOP, mode=Mode.PRIVATE)
    add(fillet3_piece_1, mode=Mode.SUBTRACT)
    with BuildSketch(Plane(origin=(19, -19, 23), x_dir=(0, 1, 0), z_dir=(0, 0, -1))) as fillet3_piece_2_section:
        with BuildLine():
            CenterArc((FILLET3_R, -FILLET3_R), FILLET3_R, 90, 90)
            Line((0, -FILLET3_R), (0, 0))
            Line((0, 0), (FILLET3_R, 0))
        make_face()
    fillet3_piece_2 = extrude(amount=24, mode=Mode.PRIVATE)
    fillet3_piece_2 = split(fillet3_piece_2, bisect_by=Plane(origin=(18.924002019, -12.501601439, 12), z_dir=(0, 0, -1)), keep=Keep.TOP, mode=Mode.PRIVATE)
    add(fillet3_piece_2, mode=Mode.SUBTRACT)

    # Fillet4
    # the kernel refuses this fillet: 6 mm, written as the material it takes off along each edge
    with BuildSketch(Plane(origin=(-28, -19, -8), x_dir=(0, 0, 1), z_dir=(1, 0, 0)), Plane(origin=(96, 19, -8), x_dir=(0, 0, 1), z_dir=(-1, 0, 0))) as fillet4_piece_1:
        with BuildLine():
            CenterArc((FILLET4_R, -FILLET4_R), FILLET4_R, 90, 90)
            Line((0, -FILLET4_R), (-FILLET4_R * 0.02, -FILLET4_R))
            Line((-FILLET4_R * 0.02, -FILLET4_R), (-FILLET4_R * 0.02, FILLET4_R * 0.02))
            Line((-FILLET4_R * 0.02, FILLET4_R * 0.02), (FILLET4_R, FILLET4_R * 0.02))
            Line((FILLET4_R, FILLET4_R * 0.02), (FILLET4_R, 0))
        make_face()
    extrude(amount=124, mode=Mode.SUBTRACT)
    with BuildSketch(Plane(origin=(96, 19, 19), x_dir=(0, 0, -1), z_dir=(-1, 0, 0)), Plane(origin=(-56, -19, 19), x_dir=(0, 0, -1), z_dir=(1, 0, 0))) as fillet4_piece_2:
        with BuildLine():
            CenterArc((FILLET4_R, FILLET4_R), FILLET4_R, 180, 90)
            Line((0, FILLET4_R), (-FILLET4_R * 0.02, FILLET4_R))
            Line((-FILLET4_R * 0.02, FILLET4_R), (-FILLET4_R * 0.02, -FILLET4_R * 0.02))
            Line((-FILLET4_R * 0.02, -FILLET4_R * 0.02), (FILLET4_R, -FILLET4_R * 0.02))
            Line((FILLET4_R, -FILLET4_R * 0.02), (FILLET4_R, 0))
        make_face()
    extrude(amount=152, mode=Mode.SUBTRACT)

    # Fillet5
    fillet5_edges = [part.edges().sort_by_distance(p)[0] for p in [
        (8, 0, 0),
    ]]
    fillet(fillet5_edges, radius=FILLET5_R)

    # Fillet6
    fillet6_edges = [part.edges().sort_by_distance(p)[0] for p in [
        (8.862066808, 16.041314475, 3),
        (8.862066808, 16.041314475, 8),
        (8.862066808, -16.041314475, 8),
        (8.862066808, -16.041314475, 3),
    ]]
    fillet(fillet6_edges, radius=FILLET6_R - 0.0001)  # a hair under: the kernel refuses the full size

    # Sketch13 → Cut-Extrude7 (cut)
    with BuildSketch(Plane.ZY.offset(-50)):
        with Locations((6.5, 13.8)):
            Circle(SKETCH13_R)
        with Locations((6.5, -13.8)):
            Circle(SKETCH13_R)
    extrude(amount=-CUT_EXTRUDE7_DEPTH, mode=Mode.SUBTRACT)

    # Sketch14 → Cut-Extrude8 (cut, two sides: drawn at the far end of the back side and taken through both)
    with BuildSketch(Plane.XY.offset(19).offset(-CUT_EXTRUDE8_DEPTH_BACK)):
        Polygon((5, 19), (60, 16.5), (60, 19), align=None)
        Polygon((60, -19), (60, -16.5), (5, -19), align=None)
    extrude(amount=CUT_EXTRUDE8_DEPTH + CUT_EXTRUDE8_DEPTH_BACK, mode=Mode.SUBTRACT)

    # Sketch15 → Cut-Extrude9 (cut, two sides: drawn at the far end of the back side and taken through both)
    with BuildSketch(Plane.XY.offset(11).offset(-CUT_EXTRUDE9_DEPTH_BACK)):
        with Locations((0, -5)):
            Circle(SKETCH15_R)
        with Locations((-48, -5)):
            Circle(SKETCH15_R)
        with Locations((-48, 5)):
            Circle(SKETCH15_R)
        with Locations((0, 5)):
            Circle(SKETCH15_R)
    extrude(amount=CUT_EXTRUDE9_DEPTH + CUT_EXTRUDE9_DEPTH_BACK, mode=Mode.SUBTRACT)

    # Sketch16 → Boss-Extrude6 (add)
    with BuildSketch(Plane.ZY.offset(-50)):
        with Locations((6.5, -13.8)):
            Circle(SKETCH16_R)
        with Locations((6.5, 13.8)):
            Circle(SKETCH16_R)
    extrude(amount=-BOSS_EXTRUDE6_DEPTH)

    # Sketch17 → Cut-Extrude10 (cut)
    with BuildSketch(Plane.ZY.offset(-50)):
        with Locations((5.5, -13.6)):
            Circle(SKETCH17_R)
        with Locations((5.5, 14)):
            Circle(SKETCH17_R)
    extrude(amount=-CUT_EXTRUDE10_DEPTH, mode=Mode.SUBTRACT)


solid = part.part
